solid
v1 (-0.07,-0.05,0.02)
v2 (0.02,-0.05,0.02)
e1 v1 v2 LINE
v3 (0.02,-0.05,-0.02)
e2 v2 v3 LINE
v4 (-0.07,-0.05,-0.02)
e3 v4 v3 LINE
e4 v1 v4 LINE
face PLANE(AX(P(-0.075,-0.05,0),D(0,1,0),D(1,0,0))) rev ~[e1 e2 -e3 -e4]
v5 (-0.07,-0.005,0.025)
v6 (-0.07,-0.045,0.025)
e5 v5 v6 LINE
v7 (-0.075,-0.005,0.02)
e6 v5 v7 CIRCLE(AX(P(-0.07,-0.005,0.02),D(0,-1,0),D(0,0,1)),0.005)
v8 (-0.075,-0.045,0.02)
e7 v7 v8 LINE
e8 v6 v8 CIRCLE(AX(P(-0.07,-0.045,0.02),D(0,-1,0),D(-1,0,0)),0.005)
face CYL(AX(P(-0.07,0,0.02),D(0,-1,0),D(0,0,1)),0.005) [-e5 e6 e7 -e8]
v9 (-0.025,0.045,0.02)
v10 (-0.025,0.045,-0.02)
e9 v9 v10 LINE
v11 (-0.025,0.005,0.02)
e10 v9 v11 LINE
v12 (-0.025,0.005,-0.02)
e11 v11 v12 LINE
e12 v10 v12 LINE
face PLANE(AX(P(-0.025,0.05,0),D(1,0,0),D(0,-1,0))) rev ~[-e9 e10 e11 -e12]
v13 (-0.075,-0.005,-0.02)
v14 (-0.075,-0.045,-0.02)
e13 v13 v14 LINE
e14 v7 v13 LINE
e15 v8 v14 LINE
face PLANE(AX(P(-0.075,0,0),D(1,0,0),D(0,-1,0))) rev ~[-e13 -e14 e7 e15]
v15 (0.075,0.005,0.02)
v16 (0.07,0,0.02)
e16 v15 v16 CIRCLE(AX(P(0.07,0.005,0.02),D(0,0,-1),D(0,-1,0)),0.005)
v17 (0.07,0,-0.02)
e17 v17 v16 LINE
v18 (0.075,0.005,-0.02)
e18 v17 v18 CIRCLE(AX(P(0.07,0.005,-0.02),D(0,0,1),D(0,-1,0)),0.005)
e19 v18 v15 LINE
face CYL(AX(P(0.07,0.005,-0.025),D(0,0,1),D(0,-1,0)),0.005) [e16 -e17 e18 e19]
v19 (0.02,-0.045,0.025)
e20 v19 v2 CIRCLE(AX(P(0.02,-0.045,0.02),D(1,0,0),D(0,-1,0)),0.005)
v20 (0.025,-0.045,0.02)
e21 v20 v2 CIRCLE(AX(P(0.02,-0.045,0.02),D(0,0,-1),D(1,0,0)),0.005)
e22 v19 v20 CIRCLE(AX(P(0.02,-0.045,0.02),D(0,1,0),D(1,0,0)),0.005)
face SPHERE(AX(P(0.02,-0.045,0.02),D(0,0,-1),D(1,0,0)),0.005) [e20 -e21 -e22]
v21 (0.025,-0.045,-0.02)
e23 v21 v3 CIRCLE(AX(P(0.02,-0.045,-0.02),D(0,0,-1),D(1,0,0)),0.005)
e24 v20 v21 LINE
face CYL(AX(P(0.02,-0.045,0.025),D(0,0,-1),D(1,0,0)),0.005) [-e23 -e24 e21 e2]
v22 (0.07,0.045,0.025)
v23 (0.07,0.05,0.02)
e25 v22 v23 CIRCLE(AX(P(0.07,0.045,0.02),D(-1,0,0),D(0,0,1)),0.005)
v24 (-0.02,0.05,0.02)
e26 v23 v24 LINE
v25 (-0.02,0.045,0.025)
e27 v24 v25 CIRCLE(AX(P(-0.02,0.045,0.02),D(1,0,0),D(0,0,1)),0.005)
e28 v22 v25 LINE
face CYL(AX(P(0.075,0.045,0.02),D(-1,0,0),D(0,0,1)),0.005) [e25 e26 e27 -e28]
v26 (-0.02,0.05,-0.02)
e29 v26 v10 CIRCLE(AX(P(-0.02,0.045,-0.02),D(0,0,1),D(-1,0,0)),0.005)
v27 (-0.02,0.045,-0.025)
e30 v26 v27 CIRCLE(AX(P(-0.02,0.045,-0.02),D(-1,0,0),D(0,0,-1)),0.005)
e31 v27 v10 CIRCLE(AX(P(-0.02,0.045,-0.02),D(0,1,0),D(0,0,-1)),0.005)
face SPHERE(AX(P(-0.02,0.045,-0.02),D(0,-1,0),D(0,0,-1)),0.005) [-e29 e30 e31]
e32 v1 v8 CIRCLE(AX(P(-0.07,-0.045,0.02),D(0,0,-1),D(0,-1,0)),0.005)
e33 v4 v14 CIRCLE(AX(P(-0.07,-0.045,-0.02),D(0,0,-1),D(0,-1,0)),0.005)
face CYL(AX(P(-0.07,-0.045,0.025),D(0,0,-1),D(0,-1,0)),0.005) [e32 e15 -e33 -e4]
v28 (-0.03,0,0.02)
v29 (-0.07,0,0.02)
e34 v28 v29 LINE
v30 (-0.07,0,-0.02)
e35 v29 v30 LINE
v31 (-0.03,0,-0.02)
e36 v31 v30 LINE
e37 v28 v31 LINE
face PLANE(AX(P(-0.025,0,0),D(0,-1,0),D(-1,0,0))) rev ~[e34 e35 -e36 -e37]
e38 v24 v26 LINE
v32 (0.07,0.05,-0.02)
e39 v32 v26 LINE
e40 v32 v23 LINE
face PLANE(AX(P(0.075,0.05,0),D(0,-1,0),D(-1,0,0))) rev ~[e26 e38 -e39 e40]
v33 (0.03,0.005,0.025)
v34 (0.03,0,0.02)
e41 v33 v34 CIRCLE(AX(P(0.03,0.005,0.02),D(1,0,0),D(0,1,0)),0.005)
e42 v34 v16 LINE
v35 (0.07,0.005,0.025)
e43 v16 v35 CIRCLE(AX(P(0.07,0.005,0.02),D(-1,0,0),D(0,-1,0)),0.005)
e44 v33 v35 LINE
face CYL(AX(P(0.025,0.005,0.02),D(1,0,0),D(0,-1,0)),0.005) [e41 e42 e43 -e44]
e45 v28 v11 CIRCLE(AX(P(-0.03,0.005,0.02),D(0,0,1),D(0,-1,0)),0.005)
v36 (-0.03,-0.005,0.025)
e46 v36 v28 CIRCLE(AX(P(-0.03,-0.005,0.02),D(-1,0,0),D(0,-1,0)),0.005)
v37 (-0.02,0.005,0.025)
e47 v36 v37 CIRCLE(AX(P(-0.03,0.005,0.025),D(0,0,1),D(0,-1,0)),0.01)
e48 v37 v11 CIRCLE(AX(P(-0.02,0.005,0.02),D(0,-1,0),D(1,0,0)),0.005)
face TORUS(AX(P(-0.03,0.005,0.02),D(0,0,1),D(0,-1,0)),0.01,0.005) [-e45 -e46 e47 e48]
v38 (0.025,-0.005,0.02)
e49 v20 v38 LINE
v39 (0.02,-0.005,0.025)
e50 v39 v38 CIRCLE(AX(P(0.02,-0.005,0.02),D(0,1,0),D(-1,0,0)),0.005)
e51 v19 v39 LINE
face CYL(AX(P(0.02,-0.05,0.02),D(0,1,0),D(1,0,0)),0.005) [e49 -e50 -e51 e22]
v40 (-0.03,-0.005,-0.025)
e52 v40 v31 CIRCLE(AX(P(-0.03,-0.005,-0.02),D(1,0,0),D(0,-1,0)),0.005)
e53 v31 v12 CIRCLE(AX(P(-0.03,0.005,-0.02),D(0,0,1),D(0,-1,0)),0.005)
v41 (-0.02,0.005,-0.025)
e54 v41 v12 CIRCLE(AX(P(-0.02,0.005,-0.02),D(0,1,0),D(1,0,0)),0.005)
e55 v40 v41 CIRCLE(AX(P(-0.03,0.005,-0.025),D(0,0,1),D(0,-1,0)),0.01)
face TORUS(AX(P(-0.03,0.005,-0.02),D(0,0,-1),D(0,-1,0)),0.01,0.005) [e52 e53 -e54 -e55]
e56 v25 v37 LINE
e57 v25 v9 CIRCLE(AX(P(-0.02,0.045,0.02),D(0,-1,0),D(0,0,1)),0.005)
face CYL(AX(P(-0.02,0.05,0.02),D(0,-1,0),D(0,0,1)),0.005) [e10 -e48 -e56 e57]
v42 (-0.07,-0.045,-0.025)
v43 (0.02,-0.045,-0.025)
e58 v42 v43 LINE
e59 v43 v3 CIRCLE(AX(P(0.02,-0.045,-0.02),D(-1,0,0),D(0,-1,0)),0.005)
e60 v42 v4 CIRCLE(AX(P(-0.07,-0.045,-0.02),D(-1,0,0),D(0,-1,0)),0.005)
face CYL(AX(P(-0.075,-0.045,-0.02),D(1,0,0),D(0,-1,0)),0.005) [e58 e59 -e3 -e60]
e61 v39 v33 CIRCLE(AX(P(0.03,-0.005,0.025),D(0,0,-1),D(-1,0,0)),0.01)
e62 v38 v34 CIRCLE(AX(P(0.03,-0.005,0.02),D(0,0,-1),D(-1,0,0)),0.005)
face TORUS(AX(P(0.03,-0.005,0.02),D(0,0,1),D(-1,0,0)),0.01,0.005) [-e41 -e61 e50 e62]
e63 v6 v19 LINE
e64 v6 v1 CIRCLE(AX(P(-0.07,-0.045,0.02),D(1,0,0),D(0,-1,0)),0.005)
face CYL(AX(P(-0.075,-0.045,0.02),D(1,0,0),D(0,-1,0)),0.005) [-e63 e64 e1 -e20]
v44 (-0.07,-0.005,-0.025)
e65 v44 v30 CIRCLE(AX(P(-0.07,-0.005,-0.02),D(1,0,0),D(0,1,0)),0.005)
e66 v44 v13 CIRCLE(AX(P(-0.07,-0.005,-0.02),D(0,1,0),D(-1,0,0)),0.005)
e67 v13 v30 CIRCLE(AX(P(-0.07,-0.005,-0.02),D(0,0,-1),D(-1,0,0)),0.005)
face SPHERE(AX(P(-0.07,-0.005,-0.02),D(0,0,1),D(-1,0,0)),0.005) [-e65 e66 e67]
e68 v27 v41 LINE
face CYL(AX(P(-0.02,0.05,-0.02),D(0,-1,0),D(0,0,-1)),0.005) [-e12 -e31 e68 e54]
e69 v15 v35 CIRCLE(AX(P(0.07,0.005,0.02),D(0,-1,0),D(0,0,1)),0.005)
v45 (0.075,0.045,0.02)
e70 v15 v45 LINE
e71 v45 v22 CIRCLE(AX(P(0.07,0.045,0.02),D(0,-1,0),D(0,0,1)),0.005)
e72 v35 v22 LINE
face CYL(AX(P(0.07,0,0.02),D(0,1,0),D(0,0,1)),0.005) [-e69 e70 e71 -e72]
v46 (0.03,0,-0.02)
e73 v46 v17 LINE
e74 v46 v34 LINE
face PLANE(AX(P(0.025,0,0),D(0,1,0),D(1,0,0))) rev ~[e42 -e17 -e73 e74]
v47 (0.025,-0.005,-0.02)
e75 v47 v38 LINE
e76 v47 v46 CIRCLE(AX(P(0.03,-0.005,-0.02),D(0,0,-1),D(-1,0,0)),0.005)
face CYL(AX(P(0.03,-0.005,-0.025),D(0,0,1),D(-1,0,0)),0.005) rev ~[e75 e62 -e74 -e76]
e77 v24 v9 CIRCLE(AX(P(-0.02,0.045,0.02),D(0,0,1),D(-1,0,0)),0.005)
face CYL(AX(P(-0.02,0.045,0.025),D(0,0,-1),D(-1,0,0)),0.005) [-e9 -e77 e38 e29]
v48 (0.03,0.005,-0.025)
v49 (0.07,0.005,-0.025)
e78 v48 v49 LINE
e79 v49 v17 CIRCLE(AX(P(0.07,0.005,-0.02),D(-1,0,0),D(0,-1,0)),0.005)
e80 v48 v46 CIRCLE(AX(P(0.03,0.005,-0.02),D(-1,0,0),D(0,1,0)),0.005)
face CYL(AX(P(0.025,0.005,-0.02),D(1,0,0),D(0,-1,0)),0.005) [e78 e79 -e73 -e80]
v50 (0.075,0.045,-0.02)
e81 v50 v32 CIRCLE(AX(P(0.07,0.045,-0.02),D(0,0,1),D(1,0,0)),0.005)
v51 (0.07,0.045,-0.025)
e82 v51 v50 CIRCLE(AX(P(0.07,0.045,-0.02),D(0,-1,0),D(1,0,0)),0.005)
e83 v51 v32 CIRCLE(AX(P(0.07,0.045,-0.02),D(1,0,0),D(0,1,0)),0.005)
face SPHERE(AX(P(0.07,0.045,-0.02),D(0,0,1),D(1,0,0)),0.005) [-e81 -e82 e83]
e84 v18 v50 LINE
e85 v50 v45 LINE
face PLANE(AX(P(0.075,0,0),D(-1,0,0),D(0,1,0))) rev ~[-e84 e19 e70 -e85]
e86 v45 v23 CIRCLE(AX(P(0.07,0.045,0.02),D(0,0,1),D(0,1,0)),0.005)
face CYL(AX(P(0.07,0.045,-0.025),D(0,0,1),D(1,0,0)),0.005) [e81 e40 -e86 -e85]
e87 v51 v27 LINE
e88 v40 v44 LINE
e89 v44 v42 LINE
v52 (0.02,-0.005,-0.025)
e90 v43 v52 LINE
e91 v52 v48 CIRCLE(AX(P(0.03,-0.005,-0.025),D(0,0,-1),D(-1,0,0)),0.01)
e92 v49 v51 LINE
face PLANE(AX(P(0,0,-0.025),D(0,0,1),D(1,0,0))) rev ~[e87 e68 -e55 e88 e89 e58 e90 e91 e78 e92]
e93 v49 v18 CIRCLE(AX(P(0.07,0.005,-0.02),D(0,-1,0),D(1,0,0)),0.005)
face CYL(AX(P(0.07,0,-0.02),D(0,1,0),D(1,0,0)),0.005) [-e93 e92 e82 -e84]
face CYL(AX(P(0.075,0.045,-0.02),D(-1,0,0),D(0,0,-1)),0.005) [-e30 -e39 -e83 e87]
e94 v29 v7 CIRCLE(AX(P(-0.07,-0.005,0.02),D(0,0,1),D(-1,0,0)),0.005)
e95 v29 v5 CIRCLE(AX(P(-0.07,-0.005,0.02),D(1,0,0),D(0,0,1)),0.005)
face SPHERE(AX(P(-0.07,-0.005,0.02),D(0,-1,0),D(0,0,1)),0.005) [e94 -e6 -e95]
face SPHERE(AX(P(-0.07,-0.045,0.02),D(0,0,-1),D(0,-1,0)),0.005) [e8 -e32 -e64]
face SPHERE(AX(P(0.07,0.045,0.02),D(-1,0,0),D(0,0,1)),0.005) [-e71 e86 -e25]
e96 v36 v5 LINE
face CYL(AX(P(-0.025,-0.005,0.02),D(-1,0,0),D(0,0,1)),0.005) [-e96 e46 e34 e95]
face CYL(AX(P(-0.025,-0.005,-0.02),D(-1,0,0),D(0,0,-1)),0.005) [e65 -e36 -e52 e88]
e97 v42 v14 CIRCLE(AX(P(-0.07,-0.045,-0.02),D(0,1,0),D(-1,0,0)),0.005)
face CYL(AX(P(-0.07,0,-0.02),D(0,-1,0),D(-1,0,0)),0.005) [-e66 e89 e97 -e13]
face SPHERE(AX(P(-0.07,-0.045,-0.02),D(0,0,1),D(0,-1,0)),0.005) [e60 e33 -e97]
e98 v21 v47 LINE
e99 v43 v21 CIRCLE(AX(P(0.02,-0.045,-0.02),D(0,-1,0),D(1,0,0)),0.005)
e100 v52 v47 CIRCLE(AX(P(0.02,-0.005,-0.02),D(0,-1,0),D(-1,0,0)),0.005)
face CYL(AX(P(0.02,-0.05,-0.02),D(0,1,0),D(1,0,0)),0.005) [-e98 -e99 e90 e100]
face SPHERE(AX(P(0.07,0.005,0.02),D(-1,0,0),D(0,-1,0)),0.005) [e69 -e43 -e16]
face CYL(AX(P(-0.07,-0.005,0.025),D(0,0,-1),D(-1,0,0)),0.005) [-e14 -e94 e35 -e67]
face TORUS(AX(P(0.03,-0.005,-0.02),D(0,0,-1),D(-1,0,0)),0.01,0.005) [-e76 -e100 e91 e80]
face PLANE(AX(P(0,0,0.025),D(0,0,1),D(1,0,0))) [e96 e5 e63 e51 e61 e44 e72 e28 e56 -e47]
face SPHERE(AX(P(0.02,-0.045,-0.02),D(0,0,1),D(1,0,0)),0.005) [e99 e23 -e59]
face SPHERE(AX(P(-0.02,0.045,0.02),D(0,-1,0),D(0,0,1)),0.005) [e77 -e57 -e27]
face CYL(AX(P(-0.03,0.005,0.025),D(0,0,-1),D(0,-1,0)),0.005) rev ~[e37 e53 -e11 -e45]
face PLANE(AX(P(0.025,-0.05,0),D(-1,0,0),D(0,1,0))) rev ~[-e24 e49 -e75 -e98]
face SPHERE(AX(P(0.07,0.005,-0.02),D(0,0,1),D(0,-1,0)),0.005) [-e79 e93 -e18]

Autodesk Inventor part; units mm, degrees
ref_plane "YZ Plane" through (0, 0, 0) normal (1, 0, 0) x (0, 1, 0)
ref_plane "XZ Plane" through (0, 0, 0) normal (0, 1, 0) x (-1, 0, 0)
ref_plane "XY Plane" through (0, 0, 0) normal (0, 0, 1) x (1, 0, 0)
sketch "Náčrt1" plane through (0, 0, 0) normal (0, 0, 1) x (1, 0, 0)
  line L0 (0, 0) -> (0.025, 0) construction
  line L1 (0.025, 0) -> (0.025, 0) construction
  line L2 (0.025, 0) -> (0.075, 0)
  line L3 (0.075, 0) -> (0.075, 0.05)
  line L4 (0.075, 0.05) -> (-0.025, 0.05)
  line L5 (-0.025, 0.05) -> (-0.025, 0)
  line L6 (-0.025, 0) -> (-0.075, 0)
  line L7 (-0.075, 0) -> (-0.075, -0.05)
  line L8 (-0.075, -0.05) -> (0.025, -0.05)
  line L9 (0.025, -0.05) -> (0.025, 0)
  dimension "d14" = 0.025
  dimension "d15" = 0
  dimension "d16" = 0.05
  dimension "d17" = 0.05
  dimension "d18" = 0.1
  dimension "d19" = 0.05
  dimension "d20" = 0.05
  dimension "d21" = 0.05
  dimension "d22" = 0.1
  dimension "d23" = 0.05
extrude "Vysunutí1" add sketch "Náčrt1" along normal mid plane 0.05
fillet "Zaoblení1" radius 0.005 22 edges at (0.025, -0.05, 0) (0.025, -0.025, 0.025) (0.025, -0.025, -0.025) (-0.075, -0.05, 0) (-0.025, -0.05, 0.025) (-0.025, -0.05, -0.025) (0.05, 0, 0.025) (0.075, 0, 0) (0.05, 0, -0.025) (-0.075, -0.025, 0.025) (-0.05, 0, 0.025) (-0.025, 0.025, 0.025) (0.025, 0.05, 0.025) (0.075, 0.025, 0.025) (-0.075, 0, 0) (-0.075, -0.025, -0.025) (0.075, 0.05, 0) (0.075, 0.025, -0.025) (-0.05, 0, -0.025) (-0.025, 0.025, -0.025) (0.025, 0.05, -0.025) (-0.025, 0.05, 0)
fillet "Zaoblení1" radius 0.005 2 edges at (0.025, 0, 0) (-0.025, 0, 0)
equation "\"d16\" = 2 * d14"
equation "\"d17\" = d16"
equation "\"d18\" = 2 * d16"
equation "\"d19\" = d16"
equation "\"d20\" = d16"
equation "\"d21\" = d16"
equation "\"d10\" = d16"
equation "\"d12\" = 0.1 * d16"
equation "\"d13\" = 0.1 * d16"
properties part number "tetris_object_cca20_chamfered"
